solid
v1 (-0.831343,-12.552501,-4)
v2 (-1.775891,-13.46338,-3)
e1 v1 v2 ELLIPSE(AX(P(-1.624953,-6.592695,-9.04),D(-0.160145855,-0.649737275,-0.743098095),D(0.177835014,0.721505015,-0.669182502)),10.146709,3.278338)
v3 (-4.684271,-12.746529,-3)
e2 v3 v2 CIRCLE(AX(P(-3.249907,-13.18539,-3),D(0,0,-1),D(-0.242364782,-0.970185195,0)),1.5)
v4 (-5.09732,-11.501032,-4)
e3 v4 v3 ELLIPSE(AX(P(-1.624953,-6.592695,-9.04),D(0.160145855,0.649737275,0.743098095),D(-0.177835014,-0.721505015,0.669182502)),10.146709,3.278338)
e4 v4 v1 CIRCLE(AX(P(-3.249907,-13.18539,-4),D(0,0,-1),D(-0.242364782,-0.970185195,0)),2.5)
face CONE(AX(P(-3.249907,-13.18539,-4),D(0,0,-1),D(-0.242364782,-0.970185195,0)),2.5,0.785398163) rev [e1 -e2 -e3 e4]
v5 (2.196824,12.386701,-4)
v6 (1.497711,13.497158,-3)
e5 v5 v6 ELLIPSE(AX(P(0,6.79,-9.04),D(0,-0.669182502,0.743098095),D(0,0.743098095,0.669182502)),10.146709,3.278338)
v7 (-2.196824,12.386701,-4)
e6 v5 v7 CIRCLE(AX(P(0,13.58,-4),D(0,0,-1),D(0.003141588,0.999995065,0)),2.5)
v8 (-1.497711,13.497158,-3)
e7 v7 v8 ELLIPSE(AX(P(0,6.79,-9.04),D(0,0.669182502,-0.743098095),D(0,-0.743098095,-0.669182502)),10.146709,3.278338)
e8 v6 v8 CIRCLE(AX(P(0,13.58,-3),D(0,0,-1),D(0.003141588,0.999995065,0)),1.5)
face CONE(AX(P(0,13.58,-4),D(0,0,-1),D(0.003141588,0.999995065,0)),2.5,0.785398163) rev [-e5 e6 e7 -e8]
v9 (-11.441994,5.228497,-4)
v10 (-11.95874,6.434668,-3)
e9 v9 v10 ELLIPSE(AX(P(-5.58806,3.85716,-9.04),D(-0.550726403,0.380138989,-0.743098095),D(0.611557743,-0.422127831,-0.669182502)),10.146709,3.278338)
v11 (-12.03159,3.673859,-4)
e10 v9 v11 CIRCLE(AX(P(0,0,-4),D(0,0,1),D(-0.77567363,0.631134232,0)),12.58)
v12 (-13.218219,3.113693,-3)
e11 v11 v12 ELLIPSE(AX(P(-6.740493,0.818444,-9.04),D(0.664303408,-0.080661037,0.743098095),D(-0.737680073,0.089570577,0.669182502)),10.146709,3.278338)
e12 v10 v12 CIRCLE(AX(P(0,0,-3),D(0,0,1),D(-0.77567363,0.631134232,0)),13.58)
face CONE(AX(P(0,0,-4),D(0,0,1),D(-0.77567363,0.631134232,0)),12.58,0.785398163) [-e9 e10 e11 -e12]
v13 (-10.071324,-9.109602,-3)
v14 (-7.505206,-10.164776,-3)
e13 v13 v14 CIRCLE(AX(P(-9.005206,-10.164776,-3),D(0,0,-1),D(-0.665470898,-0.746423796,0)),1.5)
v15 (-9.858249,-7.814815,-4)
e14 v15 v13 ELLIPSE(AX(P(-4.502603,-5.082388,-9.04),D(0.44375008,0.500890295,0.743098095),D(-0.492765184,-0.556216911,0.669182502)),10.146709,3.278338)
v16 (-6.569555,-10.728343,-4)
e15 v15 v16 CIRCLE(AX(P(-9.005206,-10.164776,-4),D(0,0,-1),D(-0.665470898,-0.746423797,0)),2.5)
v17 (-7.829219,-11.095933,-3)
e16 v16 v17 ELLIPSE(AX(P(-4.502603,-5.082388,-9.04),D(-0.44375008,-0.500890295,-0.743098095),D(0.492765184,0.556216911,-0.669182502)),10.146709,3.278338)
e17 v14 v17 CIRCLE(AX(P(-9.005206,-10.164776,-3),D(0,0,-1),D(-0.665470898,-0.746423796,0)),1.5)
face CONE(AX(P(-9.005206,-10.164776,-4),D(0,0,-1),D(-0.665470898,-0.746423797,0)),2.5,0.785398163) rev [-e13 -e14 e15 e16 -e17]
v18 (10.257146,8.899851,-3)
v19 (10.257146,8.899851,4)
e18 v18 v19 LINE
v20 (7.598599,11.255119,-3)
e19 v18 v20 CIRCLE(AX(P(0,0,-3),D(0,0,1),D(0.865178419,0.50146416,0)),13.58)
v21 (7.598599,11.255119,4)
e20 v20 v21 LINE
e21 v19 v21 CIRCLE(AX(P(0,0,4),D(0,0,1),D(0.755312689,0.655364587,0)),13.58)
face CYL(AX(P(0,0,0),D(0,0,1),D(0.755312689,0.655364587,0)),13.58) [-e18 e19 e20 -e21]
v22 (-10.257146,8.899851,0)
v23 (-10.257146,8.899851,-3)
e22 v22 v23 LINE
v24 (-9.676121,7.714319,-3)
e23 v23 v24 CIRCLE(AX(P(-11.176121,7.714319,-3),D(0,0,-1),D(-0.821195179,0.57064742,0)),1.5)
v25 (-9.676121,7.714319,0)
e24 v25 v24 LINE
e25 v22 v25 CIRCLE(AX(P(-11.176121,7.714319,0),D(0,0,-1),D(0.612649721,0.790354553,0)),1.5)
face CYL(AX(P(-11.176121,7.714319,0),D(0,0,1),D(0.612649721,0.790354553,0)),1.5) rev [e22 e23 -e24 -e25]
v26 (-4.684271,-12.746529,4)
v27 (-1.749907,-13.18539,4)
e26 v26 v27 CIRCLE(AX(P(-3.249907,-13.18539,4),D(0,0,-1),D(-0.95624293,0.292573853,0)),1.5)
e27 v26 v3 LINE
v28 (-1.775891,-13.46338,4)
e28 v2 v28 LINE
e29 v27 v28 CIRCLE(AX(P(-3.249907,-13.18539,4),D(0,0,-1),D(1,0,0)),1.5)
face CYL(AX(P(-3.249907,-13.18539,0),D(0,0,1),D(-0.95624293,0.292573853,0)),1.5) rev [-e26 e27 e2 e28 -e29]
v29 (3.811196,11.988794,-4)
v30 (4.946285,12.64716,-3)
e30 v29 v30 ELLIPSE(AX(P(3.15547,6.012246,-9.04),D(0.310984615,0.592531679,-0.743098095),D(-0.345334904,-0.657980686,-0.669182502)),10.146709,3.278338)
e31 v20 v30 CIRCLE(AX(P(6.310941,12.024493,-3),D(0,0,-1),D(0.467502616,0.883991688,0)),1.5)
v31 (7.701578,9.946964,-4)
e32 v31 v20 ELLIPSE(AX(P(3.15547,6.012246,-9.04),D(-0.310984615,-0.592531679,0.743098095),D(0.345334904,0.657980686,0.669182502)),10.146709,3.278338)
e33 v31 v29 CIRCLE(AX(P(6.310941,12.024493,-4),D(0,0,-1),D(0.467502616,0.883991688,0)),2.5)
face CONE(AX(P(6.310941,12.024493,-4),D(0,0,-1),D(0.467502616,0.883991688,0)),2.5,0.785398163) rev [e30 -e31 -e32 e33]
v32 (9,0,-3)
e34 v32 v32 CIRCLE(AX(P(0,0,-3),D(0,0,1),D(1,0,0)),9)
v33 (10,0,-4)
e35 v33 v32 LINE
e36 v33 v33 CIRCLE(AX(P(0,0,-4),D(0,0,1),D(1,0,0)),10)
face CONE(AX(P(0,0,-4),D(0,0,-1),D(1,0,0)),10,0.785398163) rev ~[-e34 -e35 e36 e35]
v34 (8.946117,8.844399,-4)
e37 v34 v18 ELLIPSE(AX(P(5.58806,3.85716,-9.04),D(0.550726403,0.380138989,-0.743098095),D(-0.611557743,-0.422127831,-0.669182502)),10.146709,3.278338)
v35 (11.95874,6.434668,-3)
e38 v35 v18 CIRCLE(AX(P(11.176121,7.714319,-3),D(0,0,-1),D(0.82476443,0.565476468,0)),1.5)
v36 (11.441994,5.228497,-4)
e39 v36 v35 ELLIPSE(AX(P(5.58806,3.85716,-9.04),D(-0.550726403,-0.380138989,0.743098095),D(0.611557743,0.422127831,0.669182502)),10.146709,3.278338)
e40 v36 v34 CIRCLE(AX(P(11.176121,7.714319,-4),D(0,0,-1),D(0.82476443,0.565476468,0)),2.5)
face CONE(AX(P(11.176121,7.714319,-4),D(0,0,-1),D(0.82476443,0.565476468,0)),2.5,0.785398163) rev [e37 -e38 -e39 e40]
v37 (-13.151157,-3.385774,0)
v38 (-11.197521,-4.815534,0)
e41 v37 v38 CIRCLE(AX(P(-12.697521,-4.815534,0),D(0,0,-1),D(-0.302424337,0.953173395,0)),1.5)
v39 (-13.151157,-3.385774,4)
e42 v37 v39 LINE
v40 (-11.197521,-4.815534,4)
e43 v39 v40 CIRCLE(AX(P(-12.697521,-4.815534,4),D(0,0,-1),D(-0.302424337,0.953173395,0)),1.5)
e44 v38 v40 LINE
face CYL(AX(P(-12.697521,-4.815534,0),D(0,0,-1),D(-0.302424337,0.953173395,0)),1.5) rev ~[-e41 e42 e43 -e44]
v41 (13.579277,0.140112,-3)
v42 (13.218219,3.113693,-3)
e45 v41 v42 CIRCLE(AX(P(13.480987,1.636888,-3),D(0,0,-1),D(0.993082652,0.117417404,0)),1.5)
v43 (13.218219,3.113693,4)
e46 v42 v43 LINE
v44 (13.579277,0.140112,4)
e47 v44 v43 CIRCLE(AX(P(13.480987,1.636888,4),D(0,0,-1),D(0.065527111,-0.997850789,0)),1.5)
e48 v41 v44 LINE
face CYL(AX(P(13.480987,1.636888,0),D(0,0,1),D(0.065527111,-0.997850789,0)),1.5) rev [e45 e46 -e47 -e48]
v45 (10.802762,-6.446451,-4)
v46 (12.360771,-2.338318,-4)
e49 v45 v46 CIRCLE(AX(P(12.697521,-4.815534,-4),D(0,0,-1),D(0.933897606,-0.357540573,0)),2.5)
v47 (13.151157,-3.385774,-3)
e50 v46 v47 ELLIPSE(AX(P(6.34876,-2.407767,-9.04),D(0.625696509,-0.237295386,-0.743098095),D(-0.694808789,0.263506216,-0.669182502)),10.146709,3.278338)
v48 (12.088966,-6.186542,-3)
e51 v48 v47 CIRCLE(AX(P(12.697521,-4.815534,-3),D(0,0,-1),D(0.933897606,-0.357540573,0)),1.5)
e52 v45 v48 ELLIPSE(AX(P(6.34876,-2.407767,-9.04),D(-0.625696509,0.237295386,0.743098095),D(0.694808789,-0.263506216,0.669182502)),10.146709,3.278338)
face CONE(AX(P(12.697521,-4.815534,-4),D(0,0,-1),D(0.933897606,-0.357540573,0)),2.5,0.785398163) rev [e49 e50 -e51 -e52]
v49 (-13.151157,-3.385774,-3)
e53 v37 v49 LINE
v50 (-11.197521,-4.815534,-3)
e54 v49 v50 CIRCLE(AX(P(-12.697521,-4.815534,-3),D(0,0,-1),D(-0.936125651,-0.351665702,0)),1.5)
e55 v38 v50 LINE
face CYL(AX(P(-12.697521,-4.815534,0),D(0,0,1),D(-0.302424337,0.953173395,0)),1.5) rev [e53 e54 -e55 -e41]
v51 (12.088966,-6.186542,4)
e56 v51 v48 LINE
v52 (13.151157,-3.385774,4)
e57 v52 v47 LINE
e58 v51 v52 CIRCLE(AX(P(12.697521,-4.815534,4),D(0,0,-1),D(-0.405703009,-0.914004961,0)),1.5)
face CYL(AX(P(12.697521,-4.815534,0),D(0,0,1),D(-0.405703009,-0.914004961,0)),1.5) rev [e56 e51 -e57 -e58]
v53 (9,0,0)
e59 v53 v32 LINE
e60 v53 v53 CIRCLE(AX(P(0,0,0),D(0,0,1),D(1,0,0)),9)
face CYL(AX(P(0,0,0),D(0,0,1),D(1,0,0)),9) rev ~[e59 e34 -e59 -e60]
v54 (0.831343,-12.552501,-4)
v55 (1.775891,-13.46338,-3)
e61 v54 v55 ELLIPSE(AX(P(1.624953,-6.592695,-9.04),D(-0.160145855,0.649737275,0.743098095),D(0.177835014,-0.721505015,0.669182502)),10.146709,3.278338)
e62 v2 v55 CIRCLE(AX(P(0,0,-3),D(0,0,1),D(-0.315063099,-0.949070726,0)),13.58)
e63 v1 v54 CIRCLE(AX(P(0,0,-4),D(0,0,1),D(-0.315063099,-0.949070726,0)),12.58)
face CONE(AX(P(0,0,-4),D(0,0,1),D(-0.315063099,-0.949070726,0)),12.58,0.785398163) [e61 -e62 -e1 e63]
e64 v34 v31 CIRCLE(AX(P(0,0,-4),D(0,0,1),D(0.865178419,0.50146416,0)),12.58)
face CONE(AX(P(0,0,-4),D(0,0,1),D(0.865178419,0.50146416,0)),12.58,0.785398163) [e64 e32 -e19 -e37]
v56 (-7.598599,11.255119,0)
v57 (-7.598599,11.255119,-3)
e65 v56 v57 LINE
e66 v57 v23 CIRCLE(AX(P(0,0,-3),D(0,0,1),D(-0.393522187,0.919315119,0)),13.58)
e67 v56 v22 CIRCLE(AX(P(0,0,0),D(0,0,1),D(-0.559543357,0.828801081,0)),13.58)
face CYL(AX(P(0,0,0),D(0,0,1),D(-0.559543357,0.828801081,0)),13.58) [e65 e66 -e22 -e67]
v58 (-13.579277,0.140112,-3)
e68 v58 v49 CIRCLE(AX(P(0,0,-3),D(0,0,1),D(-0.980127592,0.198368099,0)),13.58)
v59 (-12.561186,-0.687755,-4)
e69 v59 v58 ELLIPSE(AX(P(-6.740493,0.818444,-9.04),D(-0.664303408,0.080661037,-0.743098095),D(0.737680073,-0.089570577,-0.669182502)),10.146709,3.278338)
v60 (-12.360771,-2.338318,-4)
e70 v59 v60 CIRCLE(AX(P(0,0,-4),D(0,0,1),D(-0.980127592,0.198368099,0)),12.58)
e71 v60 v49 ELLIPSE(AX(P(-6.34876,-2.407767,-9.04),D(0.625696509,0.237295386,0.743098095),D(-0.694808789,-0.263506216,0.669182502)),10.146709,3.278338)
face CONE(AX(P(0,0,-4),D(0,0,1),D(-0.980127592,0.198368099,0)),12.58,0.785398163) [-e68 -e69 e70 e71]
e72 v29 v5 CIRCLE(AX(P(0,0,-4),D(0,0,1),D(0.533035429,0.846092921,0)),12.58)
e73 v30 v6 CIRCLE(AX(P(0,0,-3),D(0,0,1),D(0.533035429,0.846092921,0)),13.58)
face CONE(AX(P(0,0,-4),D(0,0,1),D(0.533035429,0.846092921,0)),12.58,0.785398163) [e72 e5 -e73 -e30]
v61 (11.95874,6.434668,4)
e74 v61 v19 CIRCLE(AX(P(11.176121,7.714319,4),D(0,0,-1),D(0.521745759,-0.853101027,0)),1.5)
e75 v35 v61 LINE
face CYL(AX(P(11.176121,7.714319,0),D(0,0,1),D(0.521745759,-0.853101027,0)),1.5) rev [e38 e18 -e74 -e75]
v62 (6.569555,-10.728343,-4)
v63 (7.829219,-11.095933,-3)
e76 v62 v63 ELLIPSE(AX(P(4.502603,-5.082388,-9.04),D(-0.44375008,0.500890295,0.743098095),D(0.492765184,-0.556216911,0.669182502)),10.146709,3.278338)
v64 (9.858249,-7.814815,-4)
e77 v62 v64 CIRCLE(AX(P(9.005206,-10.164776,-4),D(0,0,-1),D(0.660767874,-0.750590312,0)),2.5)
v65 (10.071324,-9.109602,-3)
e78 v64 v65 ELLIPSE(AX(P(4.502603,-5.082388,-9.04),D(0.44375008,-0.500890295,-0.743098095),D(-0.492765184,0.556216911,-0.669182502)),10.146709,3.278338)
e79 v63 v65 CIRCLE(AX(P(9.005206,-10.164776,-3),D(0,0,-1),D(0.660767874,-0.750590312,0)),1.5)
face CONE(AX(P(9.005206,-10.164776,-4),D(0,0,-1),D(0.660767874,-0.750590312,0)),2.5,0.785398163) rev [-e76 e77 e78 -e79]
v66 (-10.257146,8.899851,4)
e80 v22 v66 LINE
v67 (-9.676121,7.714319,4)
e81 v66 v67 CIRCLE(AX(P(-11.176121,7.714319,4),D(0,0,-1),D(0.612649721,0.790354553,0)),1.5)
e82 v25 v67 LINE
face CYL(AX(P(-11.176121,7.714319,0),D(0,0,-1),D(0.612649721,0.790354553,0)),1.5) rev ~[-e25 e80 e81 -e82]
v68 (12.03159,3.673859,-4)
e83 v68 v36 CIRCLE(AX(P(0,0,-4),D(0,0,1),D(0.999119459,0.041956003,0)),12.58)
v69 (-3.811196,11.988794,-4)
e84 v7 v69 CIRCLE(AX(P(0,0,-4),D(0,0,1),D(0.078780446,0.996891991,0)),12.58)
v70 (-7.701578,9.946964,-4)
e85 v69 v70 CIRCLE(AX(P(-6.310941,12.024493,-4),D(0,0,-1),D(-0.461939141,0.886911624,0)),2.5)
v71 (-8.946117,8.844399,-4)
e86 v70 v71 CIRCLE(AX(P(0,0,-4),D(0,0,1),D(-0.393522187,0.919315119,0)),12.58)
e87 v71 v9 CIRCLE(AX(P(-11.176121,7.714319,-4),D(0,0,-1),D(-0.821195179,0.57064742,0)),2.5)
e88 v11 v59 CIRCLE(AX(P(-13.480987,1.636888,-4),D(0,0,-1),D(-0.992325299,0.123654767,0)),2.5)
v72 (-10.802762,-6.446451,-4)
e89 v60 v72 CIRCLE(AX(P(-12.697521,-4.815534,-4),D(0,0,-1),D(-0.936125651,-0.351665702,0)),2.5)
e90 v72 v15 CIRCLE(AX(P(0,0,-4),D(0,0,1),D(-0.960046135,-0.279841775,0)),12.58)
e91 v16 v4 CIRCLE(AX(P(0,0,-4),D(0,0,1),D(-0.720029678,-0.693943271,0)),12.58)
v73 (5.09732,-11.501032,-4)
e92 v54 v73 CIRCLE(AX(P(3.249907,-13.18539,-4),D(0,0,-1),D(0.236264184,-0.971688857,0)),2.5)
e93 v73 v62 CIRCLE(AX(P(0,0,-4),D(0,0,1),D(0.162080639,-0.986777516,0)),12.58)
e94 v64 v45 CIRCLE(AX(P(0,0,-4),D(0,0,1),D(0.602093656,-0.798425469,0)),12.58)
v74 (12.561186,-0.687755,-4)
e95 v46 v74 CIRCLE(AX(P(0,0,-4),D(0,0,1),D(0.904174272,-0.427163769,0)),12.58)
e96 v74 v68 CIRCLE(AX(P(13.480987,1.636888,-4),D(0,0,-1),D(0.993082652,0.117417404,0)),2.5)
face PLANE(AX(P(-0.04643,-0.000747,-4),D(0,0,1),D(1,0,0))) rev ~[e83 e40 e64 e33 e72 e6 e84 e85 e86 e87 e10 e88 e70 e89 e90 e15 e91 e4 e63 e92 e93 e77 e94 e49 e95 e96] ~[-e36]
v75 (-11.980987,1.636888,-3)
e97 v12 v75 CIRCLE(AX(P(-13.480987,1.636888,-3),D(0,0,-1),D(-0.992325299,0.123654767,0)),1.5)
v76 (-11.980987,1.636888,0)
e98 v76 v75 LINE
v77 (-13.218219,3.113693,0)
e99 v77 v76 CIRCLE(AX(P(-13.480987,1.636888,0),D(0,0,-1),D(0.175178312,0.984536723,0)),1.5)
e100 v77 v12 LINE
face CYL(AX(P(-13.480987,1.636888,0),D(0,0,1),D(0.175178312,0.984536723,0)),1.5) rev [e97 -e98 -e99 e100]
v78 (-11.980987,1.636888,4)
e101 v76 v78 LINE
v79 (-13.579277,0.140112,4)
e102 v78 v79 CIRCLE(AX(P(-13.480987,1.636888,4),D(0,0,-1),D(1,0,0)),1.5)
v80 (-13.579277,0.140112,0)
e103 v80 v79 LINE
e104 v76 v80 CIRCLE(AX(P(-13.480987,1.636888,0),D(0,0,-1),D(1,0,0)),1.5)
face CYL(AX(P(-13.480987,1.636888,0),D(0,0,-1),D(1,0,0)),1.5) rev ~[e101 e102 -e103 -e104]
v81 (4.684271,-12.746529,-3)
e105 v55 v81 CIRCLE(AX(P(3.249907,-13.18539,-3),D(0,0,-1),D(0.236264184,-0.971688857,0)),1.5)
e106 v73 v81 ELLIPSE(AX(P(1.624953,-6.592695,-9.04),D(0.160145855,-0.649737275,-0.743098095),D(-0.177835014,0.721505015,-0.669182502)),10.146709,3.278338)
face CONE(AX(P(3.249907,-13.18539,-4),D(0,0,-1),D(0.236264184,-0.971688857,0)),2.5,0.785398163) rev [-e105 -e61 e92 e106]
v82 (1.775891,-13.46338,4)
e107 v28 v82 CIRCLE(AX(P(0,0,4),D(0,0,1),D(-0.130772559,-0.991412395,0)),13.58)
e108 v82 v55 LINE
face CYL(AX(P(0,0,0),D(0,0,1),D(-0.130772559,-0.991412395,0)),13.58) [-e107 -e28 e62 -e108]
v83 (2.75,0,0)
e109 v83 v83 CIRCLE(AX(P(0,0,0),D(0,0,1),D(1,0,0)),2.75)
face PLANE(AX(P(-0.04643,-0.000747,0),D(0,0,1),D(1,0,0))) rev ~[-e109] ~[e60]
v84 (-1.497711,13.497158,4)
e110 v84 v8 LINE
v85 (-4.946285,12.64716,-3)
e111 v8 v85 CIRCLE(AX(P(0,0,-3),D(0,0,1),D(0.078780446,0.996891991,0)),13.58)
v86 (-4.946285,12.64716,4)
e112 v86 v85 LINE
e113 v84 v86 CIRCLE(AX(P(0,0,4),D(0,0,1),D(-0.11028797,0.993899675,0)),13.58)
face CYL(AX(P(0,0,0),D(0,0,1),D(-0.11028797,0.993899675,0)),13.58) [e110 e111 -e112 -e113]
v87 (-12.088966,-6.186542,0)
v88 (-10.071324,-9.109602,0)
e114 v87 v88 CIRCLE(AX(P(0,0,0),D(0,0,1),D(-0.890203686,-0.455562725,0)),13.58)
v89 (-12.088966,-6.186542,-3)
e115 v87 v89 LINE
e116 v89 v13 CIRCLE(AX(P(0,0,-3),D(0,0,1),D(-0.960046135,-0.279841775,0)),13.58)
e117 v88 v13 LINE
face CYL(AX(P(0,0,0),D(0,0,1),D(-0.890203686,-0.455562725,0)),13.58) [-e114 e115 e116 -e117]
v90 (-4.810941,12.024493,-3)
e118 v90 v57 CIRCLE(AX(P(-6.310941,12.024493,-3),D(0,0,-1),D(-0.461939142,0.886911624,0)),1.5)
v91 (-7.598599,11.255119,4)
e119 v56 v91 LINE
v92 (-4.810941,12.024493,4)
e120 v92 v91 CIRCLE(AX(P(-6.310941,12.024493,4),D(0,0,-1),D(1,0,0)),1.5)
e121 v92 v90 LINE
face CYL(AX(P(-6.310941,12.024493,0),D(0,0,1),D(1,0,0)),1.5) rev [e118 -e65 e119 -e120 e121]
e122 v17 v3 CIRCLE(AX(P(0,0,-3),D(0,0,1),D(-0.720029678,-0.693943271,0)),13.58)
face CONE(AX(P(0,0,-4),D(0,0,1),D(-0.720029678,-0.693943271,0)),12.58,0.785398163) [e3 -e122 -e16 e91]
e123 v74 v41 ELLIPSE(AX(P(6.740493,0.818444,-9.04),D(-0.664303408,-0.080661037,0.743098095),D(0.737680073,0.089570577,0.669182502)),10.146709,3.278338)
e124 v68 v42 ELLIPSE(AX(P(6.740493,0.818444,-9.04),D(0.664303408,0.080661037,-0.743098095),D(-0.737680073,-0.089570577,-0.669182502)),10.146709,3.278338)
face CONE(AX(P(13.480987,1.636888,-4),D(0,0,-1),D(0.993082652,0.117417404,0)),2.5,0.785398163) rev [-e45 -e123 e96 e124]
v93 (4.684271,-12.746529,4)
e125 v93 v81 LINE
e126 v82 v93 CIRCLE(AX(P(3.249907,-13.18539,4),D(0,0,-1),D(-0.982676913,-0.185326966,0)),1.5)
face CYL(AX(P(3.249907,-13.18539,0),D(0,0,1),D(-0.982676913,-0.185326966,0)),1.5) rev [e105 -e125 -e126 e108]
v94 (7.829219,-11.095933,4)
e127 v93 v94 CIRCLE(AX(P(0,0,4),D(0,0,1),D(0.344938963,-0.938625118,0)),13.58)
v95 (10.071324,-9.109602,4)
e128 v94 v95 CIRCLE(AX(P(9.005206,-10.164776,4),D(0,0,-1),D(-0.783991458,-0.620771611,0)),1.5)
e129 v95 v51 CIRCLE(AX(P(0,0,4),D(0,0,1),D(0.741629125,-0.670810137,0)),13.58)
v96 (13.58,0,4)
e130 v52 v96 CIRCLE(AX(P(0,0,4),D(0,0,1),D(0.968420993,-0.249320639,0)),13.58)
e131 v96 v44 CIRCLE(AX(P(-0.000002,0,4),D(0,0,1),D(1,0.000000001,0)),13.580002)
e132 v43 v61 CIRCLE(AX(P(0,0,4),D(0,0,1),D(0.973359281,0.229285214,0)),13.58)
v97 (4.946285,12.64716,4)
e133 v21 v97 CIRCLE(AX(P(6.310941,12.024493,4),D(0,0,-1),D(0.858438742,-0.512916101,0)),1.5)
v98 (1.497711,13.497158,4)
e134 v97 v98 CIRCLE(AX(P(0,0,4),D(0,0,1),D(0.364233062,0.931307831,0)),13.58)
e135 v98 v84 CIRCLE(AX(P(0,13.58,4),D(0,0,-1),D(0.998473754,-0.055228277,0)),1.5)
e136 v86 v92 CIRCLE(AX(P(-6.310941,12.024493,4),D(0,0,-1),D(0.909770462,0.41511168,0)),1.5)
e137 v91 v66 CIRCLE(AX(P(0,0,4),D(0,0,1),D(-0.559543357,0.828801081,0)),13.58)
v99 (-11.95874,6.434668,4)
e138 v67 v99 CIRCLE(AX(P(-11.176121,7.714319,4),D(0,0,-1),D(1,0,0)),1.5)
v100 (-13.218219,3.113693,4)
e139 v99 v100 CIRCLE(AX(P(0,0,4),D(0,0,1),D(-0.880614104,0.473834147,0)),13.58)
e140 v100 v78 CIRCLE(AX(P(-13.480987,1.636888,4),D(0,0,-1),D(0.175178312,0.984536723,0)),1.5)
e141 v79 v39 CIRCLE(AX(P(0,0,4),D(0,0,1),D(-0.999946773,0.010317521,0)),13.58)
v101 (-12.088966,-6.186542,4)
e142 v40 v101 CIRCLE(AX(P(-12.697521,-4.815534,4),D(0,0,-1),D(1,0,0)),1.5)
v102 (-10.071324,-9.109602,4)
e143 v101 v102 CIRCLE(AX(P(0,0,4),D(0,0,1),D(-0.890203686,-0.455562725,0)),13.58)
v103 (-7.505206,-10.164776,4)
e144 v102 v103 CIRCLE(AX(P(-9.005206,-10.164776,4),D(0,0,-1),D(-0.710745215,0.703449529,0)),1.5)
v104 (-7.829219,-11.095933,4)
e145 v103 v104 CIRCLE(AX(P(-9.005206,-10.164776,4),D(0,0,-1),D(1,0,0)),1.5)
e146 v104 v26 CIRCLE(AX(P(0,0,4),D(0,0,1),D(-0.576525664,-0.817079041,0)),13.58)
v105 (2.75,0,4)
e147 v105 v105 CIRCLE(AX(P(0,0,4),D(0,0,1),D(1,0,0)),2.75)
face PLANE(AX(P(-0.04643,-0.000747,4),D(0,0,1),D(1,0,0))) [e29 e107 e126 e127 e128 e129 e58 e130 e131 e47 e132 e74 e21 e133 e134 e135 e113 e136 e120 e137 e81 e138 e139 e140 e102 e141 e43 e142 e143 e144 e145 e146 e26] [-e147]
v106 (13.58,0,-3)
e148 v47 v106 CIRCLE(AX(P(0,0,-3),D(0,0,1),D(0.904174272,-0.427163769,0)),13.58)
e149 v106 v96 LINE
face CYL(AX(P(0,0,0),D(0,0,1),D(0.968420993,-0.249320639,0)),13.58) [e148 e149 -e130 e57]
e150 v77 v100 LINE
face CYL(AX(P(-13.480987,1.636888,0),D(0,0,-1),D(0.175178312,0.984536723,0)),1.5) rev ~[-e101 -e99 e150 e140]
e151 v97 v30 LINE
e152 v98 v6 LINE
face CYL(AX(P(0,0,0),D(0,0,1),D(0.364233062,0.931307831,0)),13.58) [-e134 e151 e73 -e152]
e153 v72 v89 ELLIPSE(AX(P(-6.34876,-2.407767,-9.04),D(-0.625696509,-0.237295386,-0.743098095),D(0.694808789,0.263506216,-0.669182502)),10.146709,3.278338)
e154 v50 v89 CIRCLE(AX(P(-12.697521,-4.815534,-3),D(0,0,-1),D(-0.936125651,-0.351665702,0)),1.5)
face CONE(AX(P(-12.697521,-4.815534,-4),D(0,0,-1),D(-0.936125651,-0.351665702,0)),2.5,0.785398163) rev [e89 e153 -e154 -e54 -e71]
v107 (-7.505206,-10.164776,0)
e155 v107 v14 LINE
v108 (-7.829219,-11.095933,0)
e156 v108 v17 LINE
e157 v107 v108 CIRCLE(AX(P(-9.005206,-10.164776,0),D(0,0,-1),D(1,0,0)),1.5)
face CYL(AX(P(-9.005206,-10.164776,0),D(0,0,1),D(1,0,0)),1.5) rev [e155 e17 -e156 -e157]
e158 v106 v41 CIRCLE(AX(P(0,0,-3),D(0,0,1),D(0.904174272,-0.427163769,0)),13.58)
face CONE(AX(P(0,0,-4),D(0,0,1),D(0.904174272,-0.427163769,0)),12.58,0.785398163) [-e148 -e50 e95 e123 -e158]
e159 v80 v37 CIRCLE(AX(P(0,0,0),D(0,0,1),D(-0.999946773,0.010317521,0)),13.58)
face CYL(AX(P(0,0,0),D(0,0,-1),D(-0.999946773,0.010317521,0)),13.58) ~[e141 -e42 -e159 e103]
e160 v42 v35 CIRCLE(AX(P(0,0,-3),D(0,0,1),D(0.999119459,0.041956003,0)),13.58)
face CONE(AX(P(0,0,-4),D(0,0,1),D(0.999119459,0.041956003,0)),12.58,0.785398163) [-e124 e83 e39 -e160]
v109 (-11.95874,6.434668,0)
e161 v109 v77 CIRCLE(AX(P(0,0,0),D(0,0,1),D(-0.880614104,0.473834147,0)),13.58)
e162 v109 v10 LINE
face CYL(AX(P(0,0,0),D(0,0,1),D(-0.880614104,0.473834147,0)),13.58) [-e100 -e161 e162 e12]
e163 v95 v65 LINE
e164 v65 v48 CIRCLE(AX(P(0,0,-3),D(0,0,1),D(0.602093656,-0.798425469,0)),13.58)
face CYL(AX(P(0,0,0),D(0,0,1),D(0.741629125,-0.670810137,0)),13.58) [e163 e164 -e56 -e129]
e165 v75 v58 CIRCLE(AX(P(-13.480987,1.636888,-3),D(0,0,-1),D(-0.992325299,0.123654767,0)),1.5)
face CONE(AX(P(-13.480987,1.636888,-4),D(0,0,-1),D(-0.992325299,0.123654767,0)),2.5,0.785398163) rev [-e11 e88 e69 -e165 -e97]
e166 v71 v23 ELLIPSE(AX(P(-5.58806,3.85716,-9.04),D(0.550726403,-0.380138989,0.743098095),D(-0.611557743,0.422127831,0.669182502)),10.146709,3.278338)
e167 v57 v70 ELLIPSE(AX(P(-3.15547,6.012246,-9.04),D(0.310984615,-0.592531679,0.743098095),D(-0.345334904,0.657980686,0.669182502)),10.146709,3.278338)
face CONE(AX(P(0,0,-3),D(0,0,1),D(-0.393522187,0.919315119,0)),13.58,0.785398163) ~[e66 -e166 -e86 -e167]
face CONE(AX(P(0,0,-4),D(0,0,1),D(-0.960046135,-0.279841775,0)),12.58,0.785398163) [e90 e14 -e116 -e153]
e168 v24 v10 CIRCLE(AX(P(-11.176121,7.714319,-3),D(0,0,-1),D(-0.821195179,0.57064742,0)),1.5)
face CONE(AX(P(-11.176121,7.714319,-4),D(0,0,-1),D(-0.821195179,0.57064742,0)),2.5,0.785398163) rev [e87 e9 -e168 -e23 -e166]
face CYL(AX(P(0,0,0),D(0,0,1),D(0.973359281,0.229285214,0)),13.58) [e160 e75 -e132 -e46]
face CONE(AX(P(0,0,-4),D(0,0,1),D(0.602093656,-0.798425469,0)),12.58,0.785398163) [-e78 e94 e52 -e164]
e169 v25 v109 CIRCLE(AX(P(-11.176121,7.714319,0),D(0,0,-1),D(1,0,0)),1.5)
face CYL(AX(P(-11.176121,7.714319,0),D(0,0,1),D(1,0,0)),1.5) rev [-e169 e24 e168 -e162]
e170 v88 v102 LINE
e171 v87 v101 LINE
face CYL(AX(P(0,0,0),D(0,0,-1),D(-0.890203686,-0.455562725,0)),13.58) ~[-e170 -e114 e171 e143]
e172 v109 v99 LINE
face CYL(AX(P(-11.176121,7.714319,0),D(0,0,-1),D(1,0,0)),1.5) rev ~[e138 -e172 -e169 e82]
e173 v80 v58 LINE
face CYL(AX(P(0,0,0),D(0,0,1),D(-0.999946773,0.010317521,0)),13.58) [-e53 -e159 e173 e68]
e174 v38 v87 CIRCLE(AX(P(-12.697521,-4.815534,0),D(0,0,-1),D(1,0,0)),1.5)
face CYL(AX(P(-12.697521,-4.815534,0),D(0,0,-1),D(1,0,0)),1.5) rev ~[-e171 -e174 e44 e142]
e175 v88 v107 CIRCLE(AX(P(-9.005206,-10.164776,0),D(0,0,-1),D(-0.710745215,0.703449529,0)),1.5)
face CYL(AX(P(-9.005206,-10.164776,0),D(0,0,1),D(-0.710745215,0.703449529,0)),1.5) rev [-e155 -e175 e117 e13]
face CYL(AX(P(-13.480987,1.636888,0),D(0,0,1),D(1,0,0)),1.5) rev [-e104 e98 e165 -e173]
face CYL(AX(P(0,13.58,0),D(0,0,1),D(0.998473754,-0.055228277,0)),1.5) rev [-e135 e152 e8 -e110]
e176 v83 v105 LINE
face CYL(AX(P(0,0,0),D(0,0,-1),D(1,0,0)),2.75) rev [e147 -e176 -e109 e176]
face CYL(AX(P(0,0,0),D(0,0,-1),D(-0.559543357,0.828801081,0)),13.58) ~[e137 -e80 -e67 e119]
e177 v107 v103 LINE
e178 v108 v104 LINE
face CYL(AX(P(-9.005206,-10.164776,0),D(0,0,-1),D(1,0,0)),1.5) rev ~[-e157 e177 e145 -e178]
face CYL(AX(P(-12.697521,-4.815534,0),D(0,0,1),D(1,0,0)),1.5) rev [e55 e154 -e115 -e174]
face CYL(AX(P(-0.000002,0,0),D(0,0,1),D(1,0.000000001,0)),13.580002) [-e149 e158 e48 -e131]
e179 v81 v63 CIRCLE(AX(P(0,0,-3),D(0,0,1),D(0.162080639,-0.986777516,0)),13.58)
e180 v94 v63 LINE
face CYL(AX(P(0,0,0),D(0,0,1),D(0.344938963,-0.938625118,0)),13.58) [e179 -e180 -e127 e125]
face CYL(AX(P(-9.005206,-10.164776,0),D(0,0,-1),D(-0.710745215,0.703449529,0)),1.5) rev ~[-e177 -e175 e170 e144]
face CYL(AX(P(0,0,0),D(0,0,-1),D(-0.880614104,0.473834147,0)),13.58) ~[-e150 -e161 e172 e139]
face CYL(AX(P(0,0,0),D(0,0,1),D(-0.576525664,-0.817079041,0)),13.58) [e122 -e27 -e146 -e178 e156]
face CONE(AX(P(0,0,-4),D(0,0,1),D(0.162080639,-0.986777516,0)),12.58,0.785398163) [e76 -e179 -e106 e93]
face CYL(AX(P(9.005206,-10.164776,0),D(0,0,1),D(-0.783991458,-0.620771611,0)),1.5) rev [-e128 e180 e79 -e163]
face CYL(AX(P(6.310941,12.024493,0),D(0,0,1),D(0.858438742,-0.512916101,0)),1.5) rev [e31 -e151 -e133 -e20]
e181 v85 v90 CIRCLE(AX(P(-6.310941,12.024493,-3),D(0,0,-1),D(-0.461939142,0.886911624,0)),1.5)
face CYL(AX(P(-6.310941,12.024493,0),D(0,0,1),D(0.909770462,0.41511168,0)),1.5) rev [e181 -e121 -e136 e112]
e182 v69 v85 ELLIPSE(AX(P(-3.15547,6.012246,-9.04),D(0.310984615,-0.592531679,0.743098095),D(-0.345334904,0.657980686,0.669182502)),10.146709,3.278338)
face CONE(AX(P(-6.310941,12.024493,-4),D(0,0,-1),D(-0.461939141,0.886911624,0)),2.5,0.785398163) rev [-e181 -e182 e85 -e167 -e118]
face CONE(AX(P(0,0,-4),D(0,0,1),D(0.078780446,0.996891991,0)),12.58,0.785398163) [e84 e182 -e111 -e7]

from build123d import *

# Parameters (mm, degrees)
F0_R         = 9
F0_R_2       = 2.75
F1_DEPTH     = 4
F2_DEPTH     = 4
F3_T2_ANGLE  = 36.7292460902
F3_T4_ANGLE  = 359.64
F3_T6_ANGLE  = 36.7292460902
F3_T8_ANGLE  = 359.64
F3_T10_ANGLE = 36.7292460902
F3_T12_ANGLE = 359.64
F3_T14_ANGLE = 36.7292460902
F3_T16_ANGLE = 359.64
F3_T18_ANGLE = 36.7292460902
F3_T20_ANGLE = 359.64
F3_T22_ANGLE = 36.7292460902
F3_T24_ANGLE = 359.64
F3_T26_ANGLE = 36.7292460902
F3_T28_ANGLE = 359.64
F3_T30_ANGLE = 36.7292460902
F3_T32_ANGLE = 359.64
F3_T34_ANGLE = 36.7292460902
F3_T36_ANGLE = 359.64
F3_T38_ANGLE = 36.7292460902
F3_T40_ANGLE = 359.64
F3_T42_ANGLE = 36.7292460902
F3_T44_ANGLE = 359.64
F3_T46_ANGLE = 36.7292460902
F3_T48_ANGLE = 359.64
F3_T50_ANGLE = 36.7292460902
F3_T52_ANGLE = 359.64


# Not quite as in the source:
# - a fillet or chamfer that OpenCascade refuses, or shapes differently, is made with other operations: its cross-section is extruded or revolved along the edge and cut away or added


with BuildPart() as f1:
    # F0 (on Top) → F1 (new body)
    with BuildSketch(Plane.XY):
        with BuildLine():
            ThreePointArc((13.1511570809, -3.3857742739), (13.4723626948, -1.7064124416), (13.58, 0))
            ThreePointArc((13.58, 0), (13.579819293, 0.0700568992), (13.5792771769, 0.1401119339))
            ThreePointArc((13.5792771769, 0.1401119339), (11.9919231991, 1.4560830975), (13.218219042, 3.1136932024))
            ThreePointArc((13.218219042, 3.1136932024), (12.6975205757, 4.815534366), (11.9587395379, 6.4346677198))
            ThreePointArc((11.9587395379, 6.4346677198), (9.9416451, 6.8622221405), (10.2571463173, 8.89985109))
            ThreePointArc((10.2571463173, 8.89985109), (9.0052056989, 10.1647759602), (7.5985987892, 11.2551186773))
            ThreePointArc((7.5985987892, 11.2551186773), (5.6138559183, 10.6963087899), (4.9462849834, 12.6471603478))
            ThreePointArc((4.9462849834, 12.6471603478), (3.249906721, 13.1853898806), (1.497710631, 13.4971575847))
            ThreePointArc((1.497710631, 13.4971575847), (0, 12.08), (-1.497710631, 13.4971575847))
            ThreePointArc((-1.497710631, 13.4971575847), (-3.249906721, 13.1853898806), (-4.9462849834, 12.6471603478))
            ThreePointArc((-4.9462849834, 12.6471603478), (-4.845167239, 12.3430963913), (-4.8109406764, 12.0244928284))
            ThreePointArc((-4.8109406764, 12.0244928284), (-5.9118712396, 10.5785524476), (-7.5985987892, 11.2551186773))
            ThreePointArc((-7.5985987892, 11.2551186773), (-9.0052056989, 10.1647759602), (-10.2571463173, 8.89985109))
            ThreePointArc((-10.2571463173, 8.89985109), (-9.8291869969, 8.3744473269), (-9.6761208988, 7.7143192606))
            ThreePointArc((-9.6761208988, 7.7143192606), (-10.4426115119, 6.4058988468), (-11.9587395379, 6.4346677198))
            ThreePointArc((-11.9587395379, 6.4346677198), (-12.6975205757, 4.815534366), (-13.218219042, 3.1136932024))
            ThreePointArc((-13.218219042, 3.1136932024), (-12.3311710463, 2.6001764438), (-11.9809865103, 1.6368881179))
            ThreePointArc((-11.9809865103, 1.6368881179), (-12.4556660725, 0.5420283095), (-13.5792771769, 0.1401119339))
            ThreePointArc((-13.5792771769, 0.1401119339), (-13.4809865103, -1.6368881179), (-13.1511570809, -3.3857742739))
            ThreePointArc((-13.1511570809, -3.3857742739), (-11.811646645, -3.6050685966), (-11.1975205757, -4.815534366))
            ThreePointArc((-11.1975205757, -4.815534366), (-11.4399769841, -5.6332042965), (-12.0889660626, -6.1865418075))
            ThreePointArc((-12.0889660626, -6.1865418075), (-11.1761208988, -7.7143192606), (-10.0713235212, -9.109601667))
            ThreePointArc((-10.0713235212, -9.109601667), (-8.4347570743, -8.7774806179), (-7.5052056989, -10.1647759602))
            ThreePointArc((-7.5052056989, -10.1647759602), (-7.588522816, -10.6577360085), (-7.8292185113, -11.0959333768))
            ThreePointArc((-7.8292185113, -11.0959333768), (-6.3109406764, -12.0244928284), (-4.6842711154, -12.7465291008))
            ThreePointArc((-4.6842711154, -12.7465291008), (-3.0280358031, -11.7018895282), (-1.749906721, -13.1853898806))
            ThreePointArc((-1.749906721, -13.1853898806), (-1.7564170065, -13.3249910007), (-1.7758913513, -13.4633803299))
            ThreePointArc((-1.7758913513, -13.4633803299), (0, -13.58), (1.7758913513, -13.4633803299))
            ThreePointArc((1.7758913513, -13.4633803299), (2.8909332246, -11.7289771545), (4.6842711154, -12.7465291008))
            ThreePointArc((4.6842711154, -12.7465291008), (6.3109406764, -12.0244928284), (7.8292185113, -11.0959333768))
            ThreePointArc((7.8292185113, -11.0959333768), (8.0105217115, -9.0420098379), (10.0713235212, -9.109601667))
            ThreePointArc((10.0713235212, -9.109601667), (11.1761208988, -7.7143192606), (12.0889660626, -6.1865418075))
            ThreePointArc((12.0889660626, -6.1865418075), (11.2949962116, -4.2836270355), (13.1511570809, -3.3857742739))
        make_face()
        Circle(F0_R, mode=Mode.SUBTRACT)
        Circle(F0_R)
        Circle(F0_R_2, mode=Mode.SUBTRACT)
    extrude(amount=F1_DEPTH)

    # F0 (on Top) → F2 (join)
    with BuildSketch(Plane.XY):
        with BuildLine():
            ThreePointArc((13.1511570809, -3.3857742739), (13.4723626948, -1.7064124416), (13.58, 0))
            ThreePointArc((13.58, 0), (13.579819293, 0.0700568992), (13.5792771769, 0.1401119339))
            ThreePointArc((13.5792771769, 0.1401119339), (11.9919231991, 1.4560830975), (13.218219042, 3.1136932024))
            ThreePointArc((13.218219042, 3.1136932024), (12.6975205757, 4.815534366), (11.9587395379, 6.4346677198))
            ThreePointArc((11.9587395379, 6.4346677198), (9.9416451, 6.8622221405), (10.2571463173, 8.89985109))
            ThreePointArc((10.2571463173, 8.89985109), (9.0052056989, 10.1647759602), (7.5985987892, 11.2551186773))
            ThreePointArc((7.5985987892, 11.2551186773), (5.6138559183, 10.6963087899), (4.9462849834, 12.6471603478))
            ThreePointArc((4.9462849834, 12.6471603478), (3.249906721, 13.1853898806), (1.497710631, 13.4971575847))
            ThreePointArc((1.497710631, 13.4971575847), (0, 12.08), (-1.497710631, 13.4971575847))
            ThreePointArc((-1.497710631, 13.4971575847), (-3.249906721, 13.1853898806), (-4.9462849834, 12.6471603478))
            ThreePointArc((-4.9462849834, 12.6471603478), (-4.845167239, 12.3430963913), (-4.8109406764, 12.0244928284))
            ThreePointArc((-4.8109406764, 12.0244928284), (-5.9118712396, 10.5785524476), (-7.5985987892, 11.2551186773))
            ThreePointArc((-7.5985987892, 11.2551186773), (-9.0052056989, 10.1647759602), (-10.2571463173, 8.89985109))
            ThreePointArc((-10.2571463173, 8.89985109), (-9.8291869969, 8.3744473269), (-9.6761208988, 7.7143192606))
            ThreePointArc((-9.6761208988, 7.7143192606), (-10.4426115119, 6.4058988468), (-11.9587395379, 6.4346677198))
            ThreePointArc((-11.9587395379, 6.4346677198), (-12.6975205757, 4.815534366), (-13.218219042, 3.1136932024))
            ThreePointArc((-13.218219042, 3.1136932024), (-12.3311710463, 2.6001764438), (-11.9809865103, 1.6368881179))
            ThreePointArc((-11.9809865103, 1.6368881179), (-12.4556660725, 0.5420283095), (-13.5792771769, 0.1401119339))
            ThreePointArc((-13.5792771769, 0.1401119339), (-13.4809865103, -1.6368881179), (-13.1511570809, -3.3857742739))
            ThreePointArc((-13.1511570809, -3.3857742739), (-11.811646645, -3.6050685966), (-11.1975205757, -4.815534366))
            ThreePointArc((-11.1975205757, -4.815534366), (-11.4399769841, -5.6332042965), (-12.0889660626, -6.1865418075))
            ThreePointArc((-12.0889660626, -6.1865418075), (-11.1761208988, -7.7143192606), (-10.0713235212, -9.109601667))
            ThreePointArc((-10.0713235212, -9.109601667), (-8.4347570743, -8.7774806179), (-7.5052056989, -10.1647759602))
            ThreePointArc((-7.5052056989, -10.1647759602), (-7.588522816, -10.6577360085), (-7.8292185113, -11.0959333768))
            ThreePointArc((-7.8292185113, -11.0959333768), (-6.3109406764, -12.0244928284), (-4.6842711154, -12.7465291008))
            ThreePointArc((-4.6842711154, -12.7465291008), (-3.0280358031, -11.7018895282), (-1.749906721, -13.1853898806))
            ThreePointArc((-1.749906721, -13.1853898806), (-1.7564170065, -13.3249910007), (-1.7758913513, -13.4633803299))
            ThreePointArc((-1.7758913513, -13.4633803299), (0, -13.58), (1.7758913513, -13.4633803299))
            ThreePointArc((1.7758913513, -13.4633803299), (2.8909332246, -11.7289771545), (4.6842711154, -12.7465291008))
            ThreePointArc((4.6842711154, -12.7465291008), (6.3109406764, -12.0244928284), (7.8292185113, -11.0959333768))
            ThreePointArc((7.8292185113, -11.0959333768), (8.0105217115, -9.0420098379), (10.0713235212, -9.109601667))
            ThreePointArc((10.0713235212, -9.109601667), (11.1761208988, -7.7143192606), (12.0889660626, -6.1865418075))
            ThreePointArc((12.0889660626, -6.1865418075), (11.2949962116, -4.2836270355), (13.1511570809, -3.3857742739))
        make_face()
        Circle(F0_R, mode=Mode.SUBTRACT)
    extrude(amount=-F2_DEPTH)

    # F3: chamfer of 1 on 27 edges, made by hand

    # F3_s1 → F3_t2 (revolve, cut)
    with BuildSketch(Plane(origin=(0, 0, 0), x_dir=(0, 0, 1), z_dir=(0.9193151191, 0.3935221873, 0))):
        Polygon((-3, -13.58), (-4, -12.58), (-4, -13.58), align=None)
    revolve(axis=Axis((0, 0, -4), (0, 0, 1)), revolution_arc=F3_T2_ANGLE, mode=Mode.SUBTRACT)

    # F3_s3 → F3_t4 (revolve, cut)
    with BuildSketch(Plane(origin=(-0.0243453928, -0.0350344513, 0), x_dir=(0, 0, 1), z_dir=(-0.5706474193, -0.8211951795, 0))):
        Polygon((-4, 16.0799329854), (-3, 15.0799329854), (-4, 15.0799329854), align=None)
    revolve(axis=Axis((-11.1761208988, 7.7143192606, -4), (0, 0, -1)), revolution_arc=F3_T4_ANGLE, mode=Mode.SUBTRACT)

    # F3_s5 → F3_t6 (revolve, cut)
    with BuildSketch(Plane(origin=(0, 0, 0), x_dir=(0, 0, 1), z_dir=(0.6311342325, 0.7756736302, 0))):
        Polygon((-4, -12.58), (-3, -13.58), (-4, -13.58), align=None)
    revolve(axis=Axis((0, 0, -4), (0, 0, 1)), revolution_arc=F3_T6_ANGLE, mode=Mode.SUBTRACT)

    # F3_s7 → F3_t8 (revolve, cut)
    with BuildSketch(Plane(origin=(-0.0052754534, -0.0423353341, 0), x_dir=(0, 0, 1), z_dir=(-0.1236547672, -0.9923252988, 0))):
        Polygon((-4, 16.0799329854), (-3, 15.0799329854), (-4, 15.0799329854), align=None)
    revolve(axis=Axis((-13.4809865103, 1.6368881179, -4), (0, 0, -1)), revolution_arc=F3_T8_ANGLE, mode=Mode.SUBTRACT)

    # F3_s9 → F3_t10 (revolve, cut)
    with BuildSketch(Plane(origin=(0, 0, 0), x_dir=(0, 0, 1), z_dir=(0.1983680993, 0.9801275923, 0))):
        Polygon((-4, -12.58), (-3, -13.58), (-4, -13.58), align=None)
    revolve(axis=Axis((0, 0, -4), (0, 0, 1)), revolution_arc=F3_T10_ANGLE, mode=Mode.SUBTRACT)

    # F3_s11 → F3_t12 (revolve, cut)
    with BuildSketch(Plane(origin=(0.0150030288, -0.0399377022, 0), x_dir=(0, 0, 1), z_dir=(0.3516657018, -0.9361256508, 0))):
        Polygon((-4, 16.0799329854), (-3, 15.0799329854), (-4, 15.0799329854), align=None)
    revolve(axis=Axis((-12.6975205757, -4.815534366, -4), (0, 0, -1)), revolution_arc=F3_T12_ANGLE, mode=Mode.SUBTRACT)

    # F3_s13 → F3_t14 (revolve, cut)
    with BuildSketch(Plane(origin=(0, 0, 0), x_dir=(0, 0, 1), z_dir=(-0.2798417749, 0.9600461348, 0))):
        Polygon((-4, -12.58), (-3, -13.58), (-4, -13.58), align=None)
    revolve(axis=Axis((0, 0, -4), (0, 0, 1)), revolution_arc=F3_T14_ANGLE, mode=Mode.SUBTRACT)

    # F3_s15 → F3_t16 (revolve, cut)
    with BuildSketch(Plane(origin=(0.0318444978, -0.0283908239, 0), x_dir=(0, 0, 1), z_dir=(0.7464237966, -0.6654708979, 0))):
        Polygon((-4, 16.0799329854), (-3, 15.0799329854), (-4, 15.0799329854), align=None)
    revolve(axis=Axis((-9.0052056989, -10.1647759602, -4), (0, 0, -1)), revolution_arc=F3_T16_ANGLE, mode=Mode.SUBTRACT)

    # F3_s17 → F3_t18 (revolve, cut)
    with BuildSketch(Plane(origin=(0, 0, 0), x_dir=(0, 0, 1), z_dir=(-0.6939432709, 0.7200296777, 0))):
        Polygon((-4, -12.58), (-3, -13.58), (-4, -13.58), align=None)
    revolve(axis=Axis((0, 0, -4), (0, 0, 1)), revolution_arc=F3_T18_ANGLE, mode=Mode.SUBTRACT)

    # F3_s19 → F3_t20 (revolve, cut)
    with BuildSketch(Plane(origin=(0.0413907762, -0.0103399501, 0), x_dir=(0, 0, 1), z_dir=(0.9701851949, -0.242364782, 0))):
        Polygon((-4, 16.0799329854), (-3, 15.0799329854), (-4, 15.0799329854), align=None)
    revolve(axis=Axis((-3.249906721, -13.1853898806, -4), (0, 0, -1)), revolution_arc=F3_T20_ANGLE, mode=Mode.SUBTRACT)

    # F3_s21 → F3_t22 (revolve, cut)
    with BuildSketch(Plane(origin=(0, 0, 0), x_dir=(0, 0, 1), z_dir=(-0.9490707265, 0.3150630987, 0))):
        Polygon((-4, -12.58), (-3, -13.58), (-4, -13.58), align=None)
    revolve(axis=Axis((0, 0, -4), (0, 0, 1)), revolution_arc=F3_T22_ANGLE, mode=Mode.SUBTRACT)

    # F3_s23 → F3_t24 (revolve, cut)
    with BuildSketch(Plane(origin=(0.0414549266, 0.0100796817, 0), x_dir=(0, 0, 1), z_dir=(0.9716888571, 0.2362641846, 0))):
        Polygon((-4, 16.0799329854), (-3, 15.0799329854), (-4, 15.0799329854), align=None)
    revolve(axis=Axis((3.249906721, -13.1853898806, -4), (0, 0, -1)), revolution_arc=F3_T24_ANGLE, mode=Mode.SUBTRACT)

    # F3_s25 → F3_t26 (revolve, cut)
    with BuildSketch(Plane(origin=(0, 0, 0), x_dir=(0, 0, 1), z_dir=(-0.9867775161, -0.1620806393, 0))):
        Polygon((-4, -12.58), (-3, -13.58), (-4, -13.58), align=None)
    revolve(axis=Axis((0, 0, -4), (0, 0, 1)), revolution_arc=F3_T26_ANGLE, mode=Mode.SUBTRACT)

    # F3_s27 → F3_t28 (revolve, cut)
    with BuildSketch(Plane(origin=(0.0320222529, 0.0281901799, 0), x_dir=(0, 0, 1), z_dir=(0.7505903123, 0.6607678739, 0))):
        Polygon((-4, 16.0799329854), (-3, 15.0799329854), (-4, 15.0799329854), align=None)
    revolve(axis=Axis((9.0052056989, -10.1647759602, -4), (0, 0, -1)), revolution_arc=F3_T28_ANGLE, mode=Mode.SUBTRACT)

    # F3_s29 → F3_t30 (revolve, cut)
    with BuildSketch(Plane(origin=(0, 0, 0), x_dir=(0, 0, 1), z_dir=(-0.7984254688, -0.6020936561, 0))):
        Polygon((-4, -12.58), (-3, -13.58), (-4, -13.58), align=None)
    revolve(axis=Axis((0, 0, -4), (0, 0, 1)), revolution_arc=F3_T30_ANGLE, mode=Mode.SUBTRACT)

    # F3_s31 → F3_t32 (revolve, cut)
    with BuildSketch(Plane(origin=(0.0152536669, 0.0398426476, 0), x_dir=(0, 0, 1), z_dir=(0.3575405725, 0.9338976063, 0))):
        Polygon((-4, 16.0799329854), (-3, 15.0799329854), (-4, 15.0799329854), align=None)
    revolve(axis=Axis((12.6975205757, -4.815534366, -4), (0, 0, -1)), revolution_arc=F3_T32_ANGLE, mode=Mode.SUBTRACT)

    # F3_s33 → F3_t34 (revolve, cut)
    with BuildSketch(Plane(origin=(0, 0, 0), x_dir=(0, 0, 1), z_dir=(-0.4271637687, -0.9041742723, 0))):
        Polygon((-4, -12.58), (-3, -13.58), (-4, -13.58), align=None)
    revolve(axis=Axis((0, 0, -4), (0, 0, 1)), revolution_arc=F3_T34_ANGLE, mode=Mode.SUBTRACT)

    # F3_s35 → F3_t36 (revolve, cut)
    with BuildSketch(Plane(origin=(-0.0050093503, 0.0423676449, 0), x_dir=(0, 0, 1), z_dir=(-0.1174174037, 0.9930826518, 0))):
        Polygon((-4, 16.0799329854), (-3, 15.0799329854), (-4, 15.0799329854), align=None)
    revolve(axis=Axis((13.4809865103, 1.6368881179, -4), (0, 0, -1)), revolution_arc=F3_T36_ANGLE, mode=Mode.SUBTRACT)

    # F3_s37 → F3_t38 (revolve, cut)
    with BuildSketch(Plane(origin=(0, 0, 0), x_dir=(0, 0, 1), z_dir=(0.041956003, -0.9991194592, 0))):
        Polygon((-4, -12.58), (-3, -13.58), (-4, -13.58), align=None)
    revolve(axis=Axis((0, 0, -4), (0, 0, 1)), revolution_arc=F3_T38_ANGLE, mode=Mode.SUBTRACT)

    # F3_s39 → F3_t40 (revolve, cut)
    with BuildSketch(Plane(origin=(-0.0241247857, 0.0351867253, 0), x_dir=(0, 0, 1), z_dir=(-0.5654764676, 0.8247644297, 0))):
        Polygon((-4, 16.0799329854), (-3, 15.0799329854), (-4, 15.0799329854), align=None)
    revolve(axis=Axis((11.1761208988, 7.7143192606, -4), (0, 0, -1)), revolution_arc=F3_T40_ANGLE, mode=Mode.SUBTRACT)

    # F3_s41 → F3_t42 (revolve, cut)
    with BuildSketch(Plane(origin=(0, 0, 0), x_dir=(0, 0, 1), z_dir=(0.50146416, -0.8651784187, 0))):
        Polygon((-4, -12.58), (-3, -13.58), (-4, -13.58), align=None)
    revolve(axis=Axis((0, 0, -4), (0, 0, 1)), revolution_arc=F3_T42_ANGLE, mode=Mode.SUBTRACT)

    # F3_s43 → F3_t44 (revolve, cut)
    with BuildSketch(Plane(origin=(-0.0377135235, 0.019944951, 0), x_dir=(0, 0, 1), z_dir=(-0.8839916876, 0.4675026163, 0))):
        Polygon((-4, 16.0799329854), (-3, 15.0799329854), (-4, 15.0799329854), align=None)
    revolve(axis=Axis((6.3109406764, 12.0244928284, -4), (0, 0, -1)), revolution_arc=F3_T44_ANGLE, mode=Mode.SUBTRACT)

    # F3_s45 → F3_t46 (revolve, cut)
    with BuildSketch(Plane(origin=(0, 0, 0), x_dir=(0, 0, 1), z_dir=(0.8460929213, -0.533035429, 0))):
        Polygon((-4, -12.58), (-3, -13.58), (-4, -13.58), align=None)
    revolve(axis=Axis((0, 0, -4), (0, 0, 1)), revolution_arc=F3_T46_ANGLE, mode=Mode.SUBTRACT)

    # F3_s47 → F3_t48 (revolve, cut)
    with BuildSketch(Plane(origin=(-0.0426625475, 0.0001340288, 0), x_dir=(0, 0, 1), z_dir=(-0.9999950652, 0.0031415875, 0))):
        Polygon((-4, 16.0799329854), (-3, 15.0799329854), (-4, 15.0799329854), align=None)
    revolve(axis=Axis((0, 13.58, -4), (0, 0, -1)), revolution_arc=F3_T48_ANGLE, mode=Mode.SUBTRACT)

    # F3_s49 → F3_t50 (revolve, cut)
    with BuildSketch(Plane(origin=(0, 0, 0), x_dir=(0, 0, 1), z_dir=(0.9968919908, -0.0787804463, 0))):
        Polygon((-4, -12.58), (-3, -13.58), (-4, -13.58), align=None)
    revolve(axis=Axis((0, 0, -4), (0, 0, 1)), revolution_arc=F3_T50_ANGLE, mode=Mode.SUBTRACT)

    # F3_s51 → F3_t52 (revolve, cut)
    with BuildSketch(Plane(origin=(-0.0378380961, -0.0197075978, 0), x_dir=(0, 0, 1), z_dir=(-0.8869116246, -0.4619391412, 0))):
        Polygon((-4, 16.0799329854), (-3, 15.0799329854), (-4, 15.0799329854), align=None)
    revolve(axis=Axis((-6.3109406764, 12.0244928284, -4), (0, 0, -1)), revolution_arc=F3_T52_ANGLE, mode=Mode.SUBTRACT)

    # F3_s53 → F3_t54 (revolve, cut)
    with BuildSketch(Plane.XZ):
        Polygon((10, -4), (9, -3), (9, -4), align=None)
    revolve(axis=Axis((0, 0, -4), (0, 0, 1)), mode=Mode.SUBTRACT)


solid = f1.part
